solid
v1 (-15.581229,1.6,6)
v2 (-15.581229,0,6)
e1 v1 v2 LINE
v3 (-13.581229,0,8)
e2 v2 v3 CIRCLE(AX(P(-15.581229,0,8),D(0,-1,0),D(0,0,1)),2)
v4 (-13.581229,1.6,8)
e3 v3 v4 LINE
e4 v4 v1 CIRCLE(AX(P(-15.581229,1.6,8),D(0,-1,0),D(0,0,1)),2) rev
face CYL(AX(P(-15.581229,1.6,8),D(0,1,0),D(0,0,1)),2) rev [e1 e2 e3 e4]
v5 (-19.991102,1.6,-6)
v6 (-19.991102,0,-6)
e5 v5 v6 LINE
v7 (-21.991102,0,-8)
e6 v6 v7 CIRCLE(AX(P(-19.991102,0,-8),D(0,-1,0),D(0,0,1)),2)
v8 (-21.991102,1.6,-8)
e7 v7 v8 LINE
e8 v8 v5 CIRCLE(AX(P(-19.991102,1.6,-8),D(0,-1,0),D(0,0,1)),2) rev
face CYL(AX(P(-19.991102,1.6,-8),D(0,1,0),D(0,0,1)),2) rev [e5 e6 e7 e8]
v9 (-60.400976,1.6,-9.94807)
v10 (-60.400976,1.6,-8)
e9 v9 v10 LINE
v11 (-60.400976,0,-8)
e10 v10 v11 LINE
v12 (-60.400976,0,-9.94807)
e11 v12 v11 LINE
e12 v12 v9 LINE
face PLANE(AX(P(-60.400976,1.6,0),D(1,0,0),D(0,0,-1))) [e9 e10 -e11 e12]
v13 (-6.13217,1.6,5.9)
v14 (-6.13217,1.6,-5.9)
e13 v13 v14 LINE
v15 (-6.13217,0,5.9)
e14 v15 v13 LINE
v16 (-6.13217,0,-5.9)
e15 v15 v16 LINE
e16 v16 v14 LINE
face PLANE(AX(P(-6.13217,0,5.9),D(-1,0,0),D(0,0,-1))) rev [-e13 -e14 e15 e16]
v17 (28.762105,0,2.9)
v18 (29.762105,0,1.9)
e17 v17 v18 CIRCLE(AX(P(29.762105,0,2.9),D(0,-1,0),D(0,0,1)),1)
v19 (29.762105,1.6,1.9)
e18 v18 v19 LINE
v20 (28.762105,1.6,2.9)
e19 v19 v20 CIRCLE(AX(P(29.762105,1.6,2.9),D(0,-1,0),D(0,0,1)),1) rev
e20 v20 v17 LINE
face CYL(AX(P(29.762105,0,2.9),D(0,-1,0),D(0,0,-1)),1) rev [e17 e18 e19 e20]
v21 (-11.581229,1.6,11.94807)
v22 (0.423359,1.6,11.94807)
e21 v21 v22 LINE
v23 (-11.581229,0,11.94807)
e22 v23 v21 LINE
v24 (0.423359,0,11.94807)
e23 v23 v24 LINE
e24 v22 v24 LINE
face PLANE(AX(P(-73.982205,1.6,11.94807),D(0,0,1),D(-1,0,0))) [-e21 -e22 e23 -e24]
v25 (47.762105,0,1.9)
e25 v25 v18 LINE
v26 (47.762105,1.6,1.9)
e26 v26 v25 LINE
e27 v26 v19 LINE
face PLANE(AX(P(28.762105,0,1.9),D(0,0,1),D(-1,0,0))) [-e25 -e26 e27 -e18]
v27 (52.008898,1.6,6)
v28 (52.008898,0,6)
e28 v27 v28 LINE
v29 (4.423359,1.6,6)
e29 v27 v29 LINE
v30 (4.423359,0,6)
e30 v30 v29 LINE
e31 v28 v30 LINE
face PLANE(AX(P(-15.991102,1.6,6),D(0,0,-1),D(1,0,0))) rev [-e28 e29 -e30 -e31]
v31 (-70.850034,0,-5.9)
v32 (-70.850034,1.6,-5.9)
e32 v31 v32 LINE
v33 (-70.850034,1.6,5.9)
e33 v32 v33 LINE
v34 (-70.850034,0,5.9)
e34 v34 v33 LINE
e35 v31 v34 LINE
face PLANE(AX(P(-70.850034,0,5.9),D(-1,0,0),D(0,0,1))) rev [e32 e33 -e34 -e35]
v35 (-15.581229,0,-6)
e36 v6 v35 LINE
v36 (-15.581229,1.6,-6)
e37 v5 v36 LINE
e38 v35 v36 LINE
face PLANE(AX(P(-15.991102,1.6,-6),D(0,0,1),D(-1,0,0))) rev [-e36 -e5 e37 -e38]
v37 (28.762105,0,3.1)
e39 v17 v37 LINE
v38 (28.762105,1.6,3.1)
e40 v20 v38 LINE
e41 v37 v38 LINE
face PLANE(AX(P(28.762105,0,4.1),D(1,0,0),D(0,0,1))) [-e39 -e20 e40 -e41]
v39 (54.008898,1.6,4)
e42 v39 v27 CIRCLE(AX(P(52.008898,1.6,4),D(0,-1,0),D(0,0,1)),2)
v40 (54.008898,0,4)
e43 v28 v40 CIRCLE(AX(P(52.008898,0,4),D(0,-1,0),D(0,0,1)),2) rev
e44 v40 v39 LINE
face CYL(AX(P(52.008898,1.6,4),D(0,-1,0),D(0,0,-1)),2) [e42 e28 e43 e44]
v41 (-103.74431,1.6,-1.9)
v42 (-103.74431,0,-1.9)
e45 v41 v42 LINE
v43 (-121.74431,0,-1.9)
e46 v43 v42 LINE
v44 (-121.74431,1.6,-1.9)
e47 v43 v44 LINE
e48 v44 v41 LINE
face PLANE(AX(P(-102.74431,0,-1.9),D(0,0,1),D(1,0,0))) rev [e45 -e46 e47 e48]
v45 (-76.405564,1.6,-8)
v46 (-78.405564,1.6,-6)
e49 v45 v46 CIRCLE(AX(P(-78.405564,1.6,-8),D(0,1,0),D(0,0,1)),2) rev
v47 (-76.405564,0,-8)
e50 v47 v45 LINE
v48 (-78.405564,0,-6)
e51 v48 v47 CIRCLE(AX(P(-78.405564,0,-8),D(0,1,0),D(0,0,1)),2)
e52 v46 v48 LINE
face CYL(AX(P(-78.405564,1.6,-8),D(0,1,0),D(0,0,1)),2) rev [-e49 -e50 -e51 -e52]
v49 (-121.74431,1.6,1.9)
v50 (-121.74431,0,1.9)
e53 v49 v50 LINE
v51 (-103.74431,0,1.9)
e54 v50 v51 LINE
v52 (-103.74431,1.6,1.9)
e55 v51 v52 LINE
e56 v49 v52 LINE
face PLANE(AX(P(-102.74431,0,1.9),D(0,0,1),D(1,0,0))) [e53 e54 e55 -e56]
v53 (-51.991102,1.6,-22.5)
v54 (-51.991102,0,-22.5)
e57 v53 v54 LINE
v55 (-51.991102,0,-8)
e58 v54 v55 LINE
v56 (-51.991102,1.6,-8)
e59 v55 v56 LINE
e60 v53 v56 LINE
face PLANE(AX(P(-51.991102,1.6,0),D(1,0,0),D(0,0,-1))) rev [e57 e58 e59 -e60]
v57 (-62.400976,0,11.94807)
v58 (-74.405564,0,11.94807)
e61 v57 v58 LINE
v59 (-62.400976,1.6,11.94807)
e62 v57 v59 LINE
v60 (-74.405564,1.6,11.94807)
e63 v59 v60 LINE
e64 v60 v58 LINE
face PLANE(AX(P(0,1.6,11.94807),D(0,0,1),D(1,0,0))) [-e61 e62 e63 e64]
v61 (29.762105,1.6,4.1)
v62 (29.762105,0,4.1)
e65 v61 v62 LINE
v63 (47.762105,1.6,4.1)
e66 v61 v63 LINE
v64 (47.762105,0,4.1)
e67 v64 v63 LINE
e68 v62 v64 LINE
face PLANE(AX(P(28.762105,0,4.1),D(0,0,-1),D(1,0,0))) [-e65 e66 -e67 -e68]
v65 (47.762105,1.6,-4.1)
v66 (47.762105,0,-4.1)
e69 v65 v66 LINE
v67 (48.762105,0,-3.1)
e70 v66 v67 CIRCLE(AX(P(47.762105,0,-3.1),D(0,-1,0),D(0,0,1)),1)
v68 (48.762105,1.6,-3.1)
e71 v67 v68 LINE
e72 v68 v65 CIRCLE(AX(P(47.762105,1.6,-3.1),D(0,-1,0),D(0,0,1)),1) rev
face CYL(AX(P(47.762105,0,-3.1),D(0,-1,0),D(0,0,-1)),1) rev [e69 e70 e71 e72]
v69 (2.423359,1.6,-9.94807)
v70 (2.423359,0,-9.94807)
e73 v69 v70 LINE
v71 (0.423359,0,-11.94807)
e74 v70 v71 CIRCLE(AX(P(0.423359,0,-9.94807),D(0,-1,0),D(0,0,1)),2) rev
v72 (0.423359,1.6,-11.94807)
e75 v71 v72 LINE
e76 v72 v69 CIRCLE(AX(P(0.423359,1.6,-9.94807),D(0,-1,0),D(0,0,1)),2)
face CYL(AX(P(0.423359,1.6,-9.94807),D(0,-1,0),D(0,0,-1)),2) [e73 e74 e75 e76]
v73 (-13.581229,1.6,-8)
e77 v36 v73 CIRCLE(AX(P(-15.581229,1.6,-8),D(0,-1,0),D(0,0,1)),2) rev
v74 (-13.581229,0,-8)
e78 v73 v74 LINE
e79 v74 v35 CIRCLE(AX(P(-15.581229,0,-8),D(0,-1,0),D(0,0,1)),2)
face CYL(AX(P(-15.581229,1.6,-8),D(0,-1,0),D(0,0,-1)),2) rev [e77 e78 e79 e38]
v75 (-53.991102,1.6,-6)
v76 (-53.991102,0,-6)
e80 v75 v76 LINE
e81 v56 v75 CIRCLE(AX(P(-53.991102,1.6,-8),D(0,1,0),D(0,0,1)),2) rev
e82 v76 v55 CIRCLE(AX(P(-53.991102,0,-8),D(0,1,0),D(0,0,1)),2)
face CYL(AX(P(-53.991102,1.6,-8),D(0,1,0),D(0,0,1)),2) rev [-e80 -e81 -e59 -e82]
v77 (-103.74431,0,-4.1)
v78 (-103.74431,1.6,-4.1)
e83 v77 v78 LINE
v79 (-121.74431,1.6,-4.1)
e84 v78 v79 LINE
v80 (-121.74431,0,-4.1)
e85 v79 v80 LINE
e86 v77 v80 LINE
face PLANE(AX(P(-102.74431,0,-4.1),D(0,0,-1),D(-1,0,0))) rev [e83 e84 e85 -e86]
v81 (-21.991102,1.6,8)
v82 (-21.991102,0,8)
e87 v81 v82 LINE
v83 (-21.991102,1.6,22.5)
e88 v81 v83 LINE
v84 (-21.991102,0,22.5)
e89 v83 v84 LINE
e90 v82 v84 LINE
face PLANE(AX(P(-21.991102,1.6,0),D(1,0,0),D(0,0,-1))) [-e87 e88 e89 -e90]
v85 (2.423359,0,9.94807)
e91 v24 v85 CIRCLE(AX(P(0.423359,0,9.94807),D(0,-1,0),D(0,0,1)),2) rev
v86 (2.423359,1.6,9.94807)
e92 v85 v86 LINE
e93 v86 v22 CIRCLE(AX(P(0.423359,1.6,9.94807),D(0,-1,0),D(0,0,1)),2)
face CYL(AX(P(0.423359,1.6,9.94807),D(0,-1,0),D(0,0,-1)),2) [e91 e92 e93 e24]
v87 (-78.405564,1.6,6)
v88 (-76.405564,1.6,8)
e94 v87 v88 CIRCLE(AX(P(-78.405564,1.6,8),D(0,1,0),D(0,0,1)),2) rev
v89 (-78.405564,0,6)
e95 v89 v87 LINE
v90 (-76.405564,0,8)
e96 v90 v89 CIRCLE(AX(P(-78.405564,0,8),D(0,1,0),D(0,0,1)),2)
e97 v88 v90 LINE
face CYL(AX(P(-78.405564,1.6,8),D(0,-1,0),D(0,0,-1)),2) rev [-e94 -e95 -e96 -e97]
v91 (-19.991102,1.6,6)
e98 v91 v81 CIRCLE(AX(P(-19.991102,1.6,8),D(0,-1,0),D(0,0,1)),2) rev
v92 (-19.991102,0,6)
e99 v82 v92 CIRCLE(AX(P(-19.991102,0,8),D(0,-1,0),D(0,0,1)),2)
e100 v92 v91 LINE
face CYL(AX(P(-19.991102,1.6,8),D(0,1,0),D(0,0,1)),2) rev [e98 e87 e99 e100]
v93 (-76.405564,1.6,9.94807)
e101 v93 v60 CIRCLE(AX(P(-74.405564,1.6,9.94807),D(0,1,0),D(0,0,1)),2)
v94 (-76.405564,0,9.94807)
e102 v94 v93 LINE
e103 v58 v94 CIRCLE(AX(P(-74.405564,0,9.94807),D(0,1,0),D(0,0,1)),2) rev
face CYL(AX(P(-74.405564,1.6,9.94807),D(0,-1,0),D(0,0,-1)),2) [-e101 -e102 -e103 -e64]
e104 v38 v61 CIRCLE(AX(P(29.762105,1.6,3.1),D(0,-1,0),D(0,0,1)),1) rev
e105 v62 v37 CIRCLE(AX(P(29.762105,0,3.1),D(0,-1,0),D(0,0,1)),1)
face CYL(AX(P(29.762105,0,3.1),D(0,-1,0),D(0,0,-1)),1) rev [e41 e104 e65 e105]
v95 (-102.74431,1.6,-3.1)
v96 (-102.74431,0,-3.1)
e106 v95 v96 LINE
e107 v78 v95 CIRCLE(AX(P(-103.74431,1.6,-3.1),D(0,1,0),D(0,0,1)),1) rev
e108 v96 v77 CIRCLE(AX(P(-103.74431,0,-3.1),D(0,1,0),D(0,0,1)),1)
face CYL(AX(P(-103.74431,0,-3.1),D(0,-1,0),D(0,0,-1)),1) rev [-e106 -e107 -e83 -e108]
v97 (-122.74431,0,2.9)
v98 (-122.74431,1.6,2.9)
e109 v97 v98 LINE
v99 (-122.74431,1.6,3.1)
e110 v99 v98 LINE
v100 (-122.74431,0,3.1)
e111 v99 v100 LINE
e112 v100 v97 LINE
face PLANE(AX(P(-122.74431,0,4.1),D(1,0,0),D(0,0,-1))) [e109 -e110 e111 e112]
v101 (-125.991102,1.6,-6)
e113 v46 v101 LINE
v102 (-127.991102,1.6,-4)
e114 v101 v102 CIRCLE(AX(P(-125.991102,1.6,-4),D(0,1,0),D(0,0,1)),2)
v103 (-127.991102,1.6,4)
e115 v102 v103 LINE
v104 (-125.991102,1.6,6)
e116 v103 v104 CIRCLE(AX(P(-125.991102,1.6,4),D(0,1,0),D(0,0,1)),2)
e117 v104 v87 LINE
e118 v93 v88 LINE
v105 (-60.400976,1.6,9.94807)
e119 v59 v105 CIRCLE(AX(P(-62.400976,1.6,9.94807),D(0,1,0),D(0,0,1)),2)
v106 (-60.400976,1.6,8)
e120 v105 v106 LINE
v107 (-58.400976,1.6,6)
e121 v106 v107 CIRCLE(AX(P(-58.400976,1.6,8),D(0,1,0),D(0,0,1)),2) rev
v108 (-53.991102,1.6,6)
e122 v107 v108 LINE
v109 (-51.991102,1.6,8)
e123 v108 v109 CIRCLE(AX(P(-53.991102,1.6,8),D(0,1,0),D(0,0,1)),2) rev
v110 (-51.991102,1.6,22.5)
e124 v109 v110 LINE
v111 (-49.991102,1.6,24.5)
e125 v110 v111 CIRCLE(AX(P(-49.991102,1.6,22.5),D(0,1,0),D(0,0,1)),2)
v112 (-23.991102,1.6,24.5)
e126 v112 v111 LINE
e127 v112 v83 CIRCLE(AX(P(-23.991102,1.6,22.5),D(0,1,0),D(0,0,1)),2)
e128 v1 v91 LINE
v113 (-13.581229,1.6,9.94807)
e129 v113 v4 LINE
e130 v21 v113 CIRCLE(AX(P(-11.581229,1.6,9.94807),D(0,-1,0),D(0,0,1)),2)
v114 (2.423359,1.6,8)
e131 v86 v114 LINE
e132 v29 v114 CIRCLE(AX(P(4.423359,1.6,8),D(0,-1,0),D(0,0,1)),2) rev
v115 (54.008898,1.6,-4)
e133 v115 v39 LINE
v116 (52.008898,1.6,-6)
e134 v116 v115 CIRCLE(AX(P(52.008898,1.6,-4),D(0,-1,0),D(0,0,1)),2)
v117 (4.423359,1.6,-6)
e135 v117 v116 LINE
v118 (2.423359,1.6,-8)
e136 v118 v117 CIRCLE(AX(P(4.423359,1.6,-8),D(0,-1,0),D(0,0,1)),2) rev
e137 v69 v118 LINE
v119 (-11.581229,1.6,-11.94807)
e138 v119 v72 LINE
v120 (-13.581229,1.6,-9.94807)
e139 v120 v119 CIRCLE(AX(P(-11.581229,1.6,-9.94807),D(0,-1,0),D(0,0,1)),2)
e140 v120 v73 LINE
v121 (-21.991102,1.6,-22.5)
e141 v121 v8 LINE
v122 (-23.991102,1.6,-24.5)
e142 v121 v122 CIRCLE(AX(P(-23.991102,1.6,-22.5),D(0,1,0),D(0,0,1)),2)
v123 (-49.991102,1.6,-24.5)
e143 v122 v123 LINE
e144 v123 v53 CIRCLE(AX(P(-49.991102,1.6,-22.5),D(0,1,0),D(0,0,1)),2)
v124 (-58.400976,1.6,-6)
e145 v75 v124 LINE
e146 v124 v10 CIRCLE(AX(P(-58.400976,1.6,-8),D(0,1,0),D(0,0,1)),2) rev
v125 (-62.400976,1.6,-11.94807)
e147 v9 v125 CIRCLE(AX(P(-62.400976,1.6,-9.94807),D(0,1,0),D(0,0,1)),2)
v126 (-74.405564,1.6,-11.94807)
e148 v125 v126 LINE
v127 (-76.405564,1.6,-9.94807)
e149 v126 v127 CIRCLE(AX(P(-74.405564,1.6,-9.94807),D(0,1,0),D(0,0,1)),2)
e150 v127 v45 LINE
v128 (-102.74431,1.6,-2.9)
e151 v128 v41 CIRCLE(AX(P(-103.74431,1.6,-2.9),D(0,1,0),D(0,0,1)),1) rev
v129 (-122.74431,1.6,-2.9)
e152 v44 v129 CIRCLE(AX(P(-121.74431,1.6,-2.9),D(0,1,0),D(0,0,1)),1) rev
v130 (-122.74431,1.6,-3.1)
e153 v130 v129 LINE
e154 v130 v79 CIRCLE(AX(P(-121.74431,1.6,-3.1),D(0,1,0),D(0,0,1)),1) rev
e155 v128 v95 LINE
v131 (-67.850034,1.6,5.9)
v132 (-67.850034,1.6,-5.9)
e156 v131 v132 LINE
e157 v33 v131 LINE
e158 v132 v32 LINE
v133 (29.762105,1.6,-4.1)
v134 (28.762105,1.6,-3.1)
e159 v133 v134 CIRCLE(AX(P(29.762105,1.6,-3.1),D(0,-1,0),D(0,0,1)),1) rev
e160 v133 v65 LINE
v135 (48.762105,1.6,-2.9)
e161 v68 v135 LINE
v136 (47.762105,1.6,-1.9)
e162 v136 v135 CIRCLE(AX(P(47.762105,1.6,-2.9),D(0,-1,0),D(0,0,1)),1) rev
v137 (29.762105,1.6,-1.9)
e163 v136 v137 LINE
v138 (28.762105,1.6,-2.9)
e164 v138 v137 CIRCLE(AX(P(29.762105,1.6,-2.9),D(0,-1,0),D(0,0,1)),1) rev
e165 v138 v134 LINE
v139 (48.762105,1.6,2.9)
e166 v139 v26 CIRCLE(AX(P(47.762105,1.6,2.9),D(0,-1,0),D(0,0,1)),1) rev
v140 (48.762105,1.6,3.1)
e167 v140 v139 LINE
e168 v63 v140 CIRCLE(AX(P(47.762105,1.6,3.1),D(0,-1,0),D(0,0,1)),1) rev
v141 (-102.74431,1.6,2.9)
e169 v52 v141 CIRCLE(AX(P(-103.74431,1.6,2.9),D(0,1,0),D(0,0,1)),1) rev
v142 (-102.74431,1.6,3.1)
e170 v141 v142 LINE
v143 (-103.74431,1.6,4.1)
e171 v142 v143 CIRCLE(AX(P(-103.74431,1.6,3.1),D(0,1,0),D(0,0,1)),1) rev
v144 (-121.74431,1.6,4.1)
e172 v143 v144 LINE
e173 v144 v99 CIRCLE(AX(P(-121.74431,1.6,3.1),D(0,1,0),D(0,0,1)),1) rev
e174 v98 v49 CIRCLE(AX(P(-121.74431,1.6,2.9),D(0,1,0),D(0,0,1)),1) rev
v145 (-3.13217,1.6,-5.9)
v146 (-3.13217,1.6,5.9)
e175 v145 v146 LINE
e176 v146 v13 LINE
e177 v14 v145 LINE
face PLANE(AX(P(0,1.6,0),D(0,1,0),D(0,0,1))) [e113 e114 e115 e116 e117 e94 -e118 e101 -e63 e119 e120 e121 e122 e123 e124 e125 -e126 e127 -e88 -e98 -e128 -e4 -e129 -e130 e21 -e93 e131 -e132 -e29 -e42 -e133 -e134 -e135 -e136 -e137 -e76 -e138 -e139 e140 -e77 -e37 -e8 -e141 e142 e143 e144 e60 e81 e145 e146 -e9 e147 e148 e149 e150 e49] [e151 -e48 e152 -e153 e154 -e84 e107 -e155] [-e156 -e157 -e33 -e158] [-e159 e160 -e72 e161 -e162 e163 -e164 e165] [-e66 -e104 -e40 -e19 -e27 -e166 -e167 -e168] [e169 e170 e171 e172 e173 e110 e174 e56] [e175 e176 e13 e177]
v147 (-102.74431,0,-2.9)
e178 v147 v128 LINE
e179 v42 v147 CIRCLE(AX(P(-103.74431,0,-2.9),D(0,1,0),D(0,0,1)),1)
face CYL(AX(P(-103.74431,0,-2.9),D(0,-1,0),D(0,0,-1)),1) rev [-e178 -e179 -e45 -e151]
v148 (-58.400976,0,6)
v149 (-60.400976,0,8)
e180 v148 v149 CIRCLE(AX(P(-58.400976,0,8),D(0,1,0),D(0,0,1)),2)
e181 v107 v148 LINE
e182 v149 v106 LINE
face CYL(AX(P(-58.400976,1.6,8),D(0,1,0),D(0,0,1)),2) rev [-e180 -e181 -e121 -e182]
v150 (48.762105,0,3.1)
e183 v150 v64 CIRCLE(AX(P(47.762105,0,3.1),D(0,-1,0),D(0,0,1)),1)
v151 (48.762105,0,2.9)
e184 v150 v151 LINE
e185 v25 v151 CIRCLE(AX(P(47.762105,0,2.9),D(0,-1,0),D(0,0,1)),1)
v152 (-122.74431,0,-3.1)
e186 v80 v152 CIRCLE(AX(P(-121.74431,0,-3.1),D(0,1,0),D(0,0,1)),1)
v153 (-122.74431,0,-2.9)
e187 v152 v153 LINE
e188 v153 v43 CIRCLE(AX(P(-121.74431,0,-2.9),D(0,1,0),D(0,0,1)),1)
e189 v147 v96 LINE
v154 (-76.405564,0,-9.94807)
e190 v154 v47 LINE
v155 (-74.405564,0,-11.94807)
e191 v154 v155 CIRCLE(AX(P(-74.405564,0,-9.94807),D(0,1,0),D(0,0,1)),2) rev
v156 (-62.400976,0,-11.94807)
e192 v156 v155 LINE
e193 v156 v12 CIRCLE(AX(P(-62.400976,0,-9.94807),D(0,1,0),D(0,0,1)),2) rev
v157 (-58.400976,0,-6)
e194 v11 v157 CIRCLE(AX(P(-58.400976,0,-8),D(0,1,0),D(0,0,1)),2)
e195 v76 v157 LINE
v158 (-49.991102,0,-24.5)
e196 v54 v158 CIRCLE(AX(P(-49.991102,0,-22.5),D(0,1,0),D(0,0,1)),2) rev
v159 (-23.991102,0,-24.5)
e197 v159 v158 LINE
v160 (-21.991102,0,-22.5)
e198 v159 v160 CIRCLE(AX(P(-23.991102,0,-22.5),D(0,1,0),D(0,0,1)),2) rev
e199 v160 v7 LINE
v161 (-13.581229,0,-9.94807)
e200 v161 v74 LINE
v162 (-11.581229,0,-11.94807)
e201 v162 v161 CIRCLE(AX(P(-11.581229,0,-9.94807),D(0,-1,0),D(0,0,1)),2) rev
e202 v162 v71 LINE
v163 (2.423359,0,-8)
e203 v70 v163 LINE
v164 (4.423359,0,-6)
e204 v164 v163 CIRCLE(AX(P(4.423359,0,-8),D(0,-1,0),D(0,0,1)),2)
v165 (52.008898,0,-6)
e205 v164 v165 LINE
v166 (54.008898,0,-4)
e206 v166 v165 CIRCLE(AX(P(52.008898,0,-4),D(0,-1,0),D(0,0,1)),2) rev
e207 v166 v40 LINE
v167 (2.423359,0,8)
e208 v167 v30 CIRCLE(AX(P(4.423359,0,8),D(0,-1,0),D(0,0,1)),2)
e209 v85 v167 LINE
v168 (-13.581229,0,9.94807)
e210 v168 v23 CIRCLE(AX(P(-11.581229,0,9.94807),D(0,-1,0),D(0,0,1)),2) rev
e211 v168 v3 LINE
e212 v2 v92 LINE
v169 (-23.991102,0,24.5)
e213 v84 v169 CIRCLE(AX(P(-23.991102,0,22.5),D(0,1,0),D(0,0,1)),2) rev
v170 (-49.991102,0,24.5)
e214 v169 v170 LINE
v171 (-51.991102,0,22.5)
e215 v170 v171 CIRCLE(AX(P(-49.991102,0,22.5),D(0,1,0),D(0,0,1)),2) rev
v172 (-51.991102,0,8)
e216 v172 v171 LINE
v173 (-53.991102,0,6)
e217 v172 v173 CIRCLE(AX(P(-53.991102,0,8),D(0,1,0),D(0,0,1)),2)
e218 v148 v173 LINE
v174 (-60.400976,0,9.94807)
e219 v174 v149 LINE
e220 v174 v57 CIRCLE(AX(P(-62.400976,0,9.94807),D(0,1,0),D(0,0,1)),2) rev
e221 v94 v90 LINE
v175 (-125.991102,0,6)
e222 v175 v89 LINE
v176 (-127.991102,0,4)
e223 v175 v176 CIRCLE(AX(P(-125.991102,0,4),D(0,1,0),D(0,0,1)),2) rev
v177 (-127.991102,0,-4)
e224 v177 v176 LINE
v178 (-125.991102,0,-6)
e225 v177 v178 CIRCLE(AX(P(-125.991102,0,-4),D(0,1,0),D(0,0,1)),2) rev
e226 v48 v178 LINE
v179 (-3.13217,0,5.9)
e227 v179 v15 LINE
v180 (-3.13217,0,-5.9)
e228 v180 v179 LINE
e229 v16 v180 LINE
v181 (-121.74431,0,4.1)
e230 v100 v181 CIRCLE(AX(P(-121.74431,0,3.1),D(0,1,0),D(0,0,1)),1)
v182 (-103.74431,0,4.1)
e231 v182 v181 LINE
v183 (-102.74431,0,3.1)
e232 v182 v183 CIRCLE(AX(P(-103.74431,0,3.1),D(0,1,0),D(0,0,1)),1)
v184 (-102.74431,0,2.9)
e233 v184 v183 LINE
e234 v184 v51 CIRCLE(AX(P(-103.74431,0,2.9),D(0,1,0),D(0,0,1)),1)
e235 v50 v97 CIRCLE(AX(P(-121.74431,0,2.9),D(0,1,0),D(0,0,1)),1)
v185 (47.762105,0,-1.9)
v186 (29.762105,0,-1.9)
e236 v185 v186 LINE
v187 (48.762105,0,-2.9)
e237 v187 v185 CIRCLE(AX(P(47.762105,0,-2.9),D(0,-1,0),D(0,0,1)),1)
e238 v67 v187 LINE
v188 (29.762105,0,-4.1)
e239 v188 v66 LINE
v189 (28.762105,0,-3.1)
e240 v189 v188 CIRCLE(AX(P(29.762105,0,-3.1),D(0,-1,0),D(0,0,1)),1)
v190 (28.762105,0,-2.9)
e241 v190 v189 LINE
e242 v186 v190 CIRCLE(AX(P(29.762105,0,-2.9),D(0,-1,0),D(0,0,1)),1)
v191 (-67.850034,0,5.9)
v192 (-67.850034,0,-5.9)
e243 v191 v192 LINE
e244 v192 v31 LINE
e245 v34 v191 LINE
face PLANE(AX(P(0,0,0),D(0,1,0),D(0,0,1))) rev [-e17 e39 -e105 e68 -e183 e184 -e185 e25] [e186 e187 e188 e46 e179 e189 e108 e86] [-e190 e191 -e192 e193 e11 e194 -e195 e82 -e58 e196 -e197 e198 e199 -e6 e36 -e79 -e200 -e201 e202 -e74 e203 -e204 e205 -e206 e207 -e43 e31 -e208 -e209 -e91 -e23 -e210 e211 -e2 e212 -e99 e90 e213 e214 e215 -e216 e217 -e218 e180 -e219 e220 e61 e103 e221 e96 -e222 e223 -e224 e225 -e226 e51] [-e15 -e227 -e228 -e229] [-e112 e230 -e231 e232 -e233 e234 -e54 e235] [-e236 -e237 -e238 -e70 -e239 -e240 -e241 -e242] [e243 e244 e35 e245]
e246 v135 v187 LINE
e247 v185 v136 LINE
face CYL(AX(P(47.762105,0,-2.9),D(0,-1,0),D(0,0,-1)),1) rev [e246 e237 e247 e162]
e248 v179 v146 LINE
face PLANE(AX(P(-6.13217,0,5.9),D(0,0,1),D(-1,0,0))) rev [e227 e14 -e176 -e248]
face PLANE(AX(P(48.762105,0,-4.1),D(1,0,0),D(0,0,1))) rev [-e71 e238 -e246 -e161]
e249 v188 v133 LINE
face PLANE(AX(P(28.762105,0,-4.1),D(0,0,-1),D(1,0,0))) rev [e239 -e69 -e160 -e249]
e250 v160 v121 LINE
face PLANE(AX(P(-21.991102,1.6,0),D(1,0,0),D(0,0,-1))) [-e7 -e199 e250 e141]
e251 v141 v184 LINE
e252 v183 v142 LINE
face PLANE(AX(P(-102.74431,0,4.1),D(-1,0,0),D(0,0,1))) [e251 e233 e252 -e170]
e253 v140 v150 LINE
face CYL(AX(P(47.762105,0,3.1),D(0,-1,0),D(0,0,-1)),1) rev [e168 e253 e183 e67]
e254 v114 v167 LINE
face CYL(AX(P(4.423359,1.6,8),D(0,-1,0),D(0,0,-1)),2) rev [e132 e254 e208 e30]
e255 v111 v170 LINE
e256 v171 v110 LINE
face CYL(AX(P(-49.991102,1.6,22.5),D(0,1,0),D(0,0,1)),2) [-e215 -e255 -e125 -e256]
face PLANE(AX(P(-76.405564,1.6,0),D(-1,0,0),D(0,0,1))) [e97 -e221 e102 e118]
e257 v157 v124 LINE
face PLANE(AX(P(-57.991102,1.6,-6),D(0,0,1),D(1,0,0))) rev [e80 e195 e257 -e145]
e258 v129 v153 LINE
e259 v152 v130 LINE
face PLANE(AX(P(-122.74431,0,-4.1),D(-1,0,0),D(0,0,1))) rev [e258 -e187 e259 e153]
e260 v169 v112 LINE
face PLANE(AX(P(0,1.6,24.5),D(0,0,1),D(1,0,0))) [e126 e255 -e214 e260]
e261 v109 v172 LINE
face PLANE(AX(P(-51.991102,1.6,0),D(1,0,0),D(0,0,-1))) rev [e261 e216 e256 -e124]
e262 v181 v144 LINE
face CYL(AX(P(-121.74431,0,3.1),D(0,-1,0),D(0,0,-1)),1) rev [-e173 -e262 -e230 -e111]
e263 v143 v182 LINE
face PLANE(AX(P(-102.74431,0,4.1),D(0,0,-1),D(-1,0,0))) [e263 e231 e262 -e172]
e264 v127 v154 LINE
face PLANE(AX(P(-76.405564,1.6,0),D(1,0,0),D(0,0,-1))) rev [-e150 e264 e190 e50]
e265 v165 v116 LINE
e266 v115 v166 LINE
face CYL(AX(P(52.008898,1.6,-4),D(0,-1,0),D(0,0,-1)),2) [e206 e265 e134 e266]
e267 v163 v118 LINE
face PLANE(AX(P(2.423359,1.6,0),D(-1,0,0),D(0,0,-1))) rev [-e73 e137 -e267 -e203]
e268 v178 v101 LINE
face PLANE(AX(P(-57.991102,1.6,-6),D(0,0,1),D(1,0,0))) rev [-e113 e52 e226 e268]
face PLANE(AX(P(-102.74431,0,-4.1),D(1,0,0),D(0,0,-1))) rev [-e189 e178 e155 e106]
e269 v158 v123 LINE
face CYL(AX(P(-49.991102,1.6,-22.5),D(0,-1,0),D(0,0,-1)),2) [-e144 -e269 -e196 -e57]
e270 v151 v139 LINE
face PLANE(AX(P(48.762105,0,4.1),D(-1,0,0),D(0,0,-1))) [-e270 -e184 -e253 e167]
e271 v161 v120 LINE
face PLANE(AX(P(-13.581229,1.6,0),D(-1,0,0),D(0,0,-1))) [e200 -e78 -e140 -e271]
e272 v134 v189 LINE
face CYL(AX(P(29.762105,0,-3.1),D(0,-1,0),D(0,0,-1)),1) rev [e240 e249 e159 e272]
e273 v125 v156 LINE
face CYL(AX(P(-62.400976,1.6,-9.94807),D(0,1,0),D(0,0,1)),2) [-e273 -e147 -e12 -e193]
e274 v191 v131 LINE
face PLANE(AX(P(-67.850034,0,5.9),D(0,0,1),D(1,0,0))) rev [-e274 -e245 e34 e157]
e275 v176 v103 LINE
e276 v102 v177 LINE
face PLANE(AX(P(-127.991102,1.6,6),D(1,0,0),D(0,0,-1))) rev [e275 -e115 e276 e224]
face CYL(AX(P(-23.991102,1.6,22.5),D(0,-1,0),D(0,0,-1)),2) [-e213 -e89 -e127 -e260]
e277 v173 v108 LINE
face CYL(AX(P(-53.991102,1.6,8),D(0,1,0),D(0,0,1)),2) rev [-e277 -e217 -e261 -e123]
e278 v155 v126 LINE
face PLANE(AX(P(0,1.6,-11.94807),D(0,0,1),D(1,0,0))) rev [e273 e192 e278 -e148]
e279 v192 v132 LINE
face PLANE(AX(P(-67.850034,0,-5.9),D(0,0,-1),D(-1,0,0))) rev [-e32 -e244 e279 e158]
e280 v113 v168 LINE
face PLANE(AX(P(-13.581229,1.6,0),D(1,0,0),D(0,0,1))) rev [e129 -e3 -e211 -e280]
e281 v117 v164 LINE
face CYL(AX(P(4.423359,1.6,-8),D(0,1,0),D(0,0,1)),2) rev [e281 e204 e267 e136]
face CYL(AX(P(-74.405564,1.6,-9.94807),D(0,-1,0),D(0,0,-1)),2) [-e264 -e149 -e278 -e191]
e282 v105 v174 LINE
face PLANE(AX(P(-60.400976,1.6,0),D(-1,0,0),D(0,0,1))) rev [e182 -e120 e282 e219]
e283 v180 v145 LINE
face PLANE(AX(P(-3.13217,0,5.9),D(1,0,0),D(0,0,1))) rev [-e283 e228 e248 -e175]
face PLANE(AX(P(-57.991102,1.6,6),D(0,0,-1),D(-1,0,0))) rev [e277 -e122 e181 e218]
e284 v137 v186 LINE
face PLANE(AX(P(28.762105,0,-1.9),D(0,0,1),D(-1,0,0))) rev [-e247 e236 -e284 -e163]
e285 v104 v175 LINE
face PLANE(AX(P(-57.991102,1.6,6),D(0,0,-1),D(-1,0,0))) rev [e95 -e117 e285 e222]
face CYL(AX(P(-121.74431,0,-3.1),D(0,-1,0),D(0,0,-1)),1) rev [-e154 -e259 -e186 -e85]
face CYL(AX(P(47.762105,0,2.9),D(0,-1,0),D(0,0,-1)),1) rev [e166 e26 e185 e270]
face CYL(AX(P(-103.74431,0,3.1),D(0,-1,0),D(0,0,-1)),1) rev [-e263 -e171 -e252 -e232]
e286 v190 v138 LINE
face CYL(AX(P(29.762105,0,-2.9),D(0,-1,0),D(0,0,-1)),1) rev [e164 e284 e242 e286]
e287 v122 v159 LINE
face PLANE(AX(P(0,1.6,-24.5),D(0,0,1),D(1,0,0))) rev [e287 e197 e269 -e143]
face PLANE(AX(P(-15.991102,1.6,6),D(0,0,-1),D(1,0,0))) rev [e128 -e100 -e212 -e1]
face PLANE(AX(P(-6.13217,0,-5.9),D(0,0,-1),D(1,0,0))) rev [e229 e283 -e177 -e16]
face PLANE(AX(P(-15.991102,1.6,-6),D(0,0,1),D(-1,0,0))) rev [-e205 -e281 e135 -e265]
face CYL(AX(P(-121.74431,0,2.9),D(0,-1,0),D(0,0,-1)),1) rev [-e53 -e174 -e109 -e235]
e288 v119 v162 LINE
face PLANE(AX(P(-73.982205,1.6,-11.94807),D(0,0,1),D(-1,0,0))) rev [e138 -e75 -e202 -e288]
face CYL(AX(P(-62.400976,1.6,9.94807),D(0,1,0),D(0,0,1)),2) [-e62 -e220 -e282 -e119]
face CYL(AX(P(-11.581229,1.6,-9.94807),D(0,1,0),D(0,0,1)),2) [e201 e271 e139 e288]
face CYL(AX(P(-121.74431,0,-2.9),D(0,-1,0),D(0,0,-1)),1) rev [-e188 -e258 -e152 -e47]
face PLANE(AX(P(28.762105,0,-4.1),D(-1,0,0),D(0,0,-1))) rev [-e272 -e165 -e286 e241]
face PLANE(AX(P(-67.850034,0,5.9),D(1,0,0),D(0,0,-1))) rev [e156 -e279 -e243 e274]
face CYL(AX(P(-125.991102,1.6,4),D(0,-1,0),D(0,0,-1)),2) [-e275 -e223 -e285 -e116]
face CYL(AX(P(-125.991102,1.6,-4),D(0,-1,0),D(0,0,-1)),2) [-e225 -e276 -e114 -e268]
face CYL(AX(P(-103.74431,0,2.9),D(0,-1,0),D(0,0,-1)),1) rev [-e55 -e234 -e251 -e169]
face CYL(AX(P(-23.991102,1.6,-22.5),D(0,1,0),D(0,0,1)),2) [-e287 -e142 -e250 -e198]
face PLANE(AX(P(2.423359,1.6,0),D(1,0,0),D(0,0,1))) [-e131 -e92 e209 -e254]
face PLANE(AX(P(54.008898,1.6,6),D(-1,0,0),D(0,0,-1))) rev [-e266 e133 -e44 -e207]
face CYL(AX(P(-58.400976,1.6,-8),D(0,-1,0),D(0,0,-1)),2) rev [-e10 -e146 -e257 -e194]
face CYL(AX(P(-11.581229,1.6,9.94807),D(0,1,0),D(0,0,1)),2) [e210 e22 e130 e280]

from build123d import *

# Parameters (mm, degrees)
SKETCH_11_W             = 70
SKETCH_11_H             = 12
EXTRUDE_6_DEPTH         = 1.6
SKETCH_12_W             = 3
SKETCH_12_H             = 11.8
CUT_EXTRUDE_6_DEPTH     = 1.6
SKETCH_13_W             = 20
SKETCH_13_H             = 2.2
CUT_EXTRUDE_7_DEPTH     = 1.6
FILLET_1_R              = 1
FILLET_1_OF_MIRROR_15_R = 1
EXTRUDE_7_DEPTH         = 1.6
SKETCH_16_W             = 6
SKETCH_16_H             = 12
EXTRUDE_9_DEPTH         = 1.6
SKETCH_18_W             = 30
SKETCH_18_H             = 49
EXTRUDE_12_DEPTH        = 1.6
FILLET_3_R              = 2
MIRROR_24_OUTLINE_W     = 3
MIRROR_24_OUTLINE_H     = 11.8
MIRROR_24_DEPTH         = 1.6
FILLET_4_R              = 2


# Read off the part's stored shape, not the designer's step: 镜向24
with BuildPart() as part:
    # 草图11 → 凸台-拉伸6 (new body)
    with BuildSketch(Plane(origin=(0, 0, 0), x_dir=(1, 0, 0), z_dir=(0, 1, 0))):
        with Locations((-92.991102456, 0)):
            Rectangle(SKETCH_11_W, SKETCH_11_H)
    extrude(amount=EXTRUDE_6_DEPTH)

    # 草图12 → 切除-拉伸6 (cut)
    with BuildSketch(Plane(origin=(0, 1.6, 0), x_dir=(1, 0, 0), z_dir=(0, 1, 0))):
        with Locations((-69.350034459, 0)):
            Rectangle(SKETCH_12_W, SKETCH_12_H)
    extrude(amount=-CUT_EXTRUDE_6_DEPTH, mode=Mode.SUBTRACT)

    # 草图13 → 切除-拉伸7 (cut)
    with BuildSketch(Plane(origin=(0, 1.6, 0), x_dir=(1, 0, 0), z_dir=(0, 1, 0))):
        with Locations((-112.744310304, 3)):
            Rectangle(SKETCH_13_W, SKETCH_13_H)
    cut_extrude_7 = extrude(amount=-CUT_EXTRUDE_7_DEPTH, mode=Mode.SUBTRACT)

    # 圆角1
    fillet_1_edges = [part.edges().sort_by_distance(p)[0] for p in [
        (-122.744310304, 0.8, -1.9),
        (-122.744310304, 0.8, -4.1),
        (-102.744310304, 0.8, -4.1),
        (-102.744310304, 0.8, -1.9),
    ]]
    fillet(fillet_1_edges, radius=FILLET_1_R)

    # 镜向15: 切除-拉伸7 across plane
    add(cut_extrude_7.mirror(Plane(origin=(0, 0, 0), x_dir=(1, 0, 0), z_dir=(0, 0, -1))), mode=Mode.SUBTRACT)

    # 圆角1 of 镜向15
    fillet_1_of_mirror_15_edges = [part.edges().sort_by_distance(p)[0] for p in [
        (-122.744310304, 0.8, 1.9),
        (-122.744310304, 0.8, 4.1),
        (-102.744310304, 0.8, 4.1),
        (-102.744310304, 0.8, 1.9),
    ]]
    fillet(fillet_1_of_mirror_15_edges, radius=FILLET_1_OF_MIRROR_15_R)

    # 草图14 → 凸台-拉伸7 (add)
    with BuildSketch(Plane(origin=(0, 0, 0), x_dir=(1, 0, 0), z_dir=(0, 1, 0))):
        Polygon((-60.400975616, 6), (-60.400975616, 11.948069584), (-62.610711949, 11.948069584), (-76.405563985, 11.948069584), (-76.405563985, 6), (-74.195827651, 6), (-62.609356584, 6), align=None)
    extrude_7 = extrude(amount=EXTRUDE_7_DEPTH)

    # 镜向17: 凸台-拉伸7 across plane
    add(extrude_7.mirror(Plane(origin=(0, 0, 0), x_dir=(1, 0, 0), z_dir=(0, 0, -1))))

    # 草图16 → 凸台-拉伸9 (add)
    with BuildSketch(Plane(origin=(0, 0, 0), x_dir=(1, 0, 0), z_dir=(0, 1, 0))):
        with Locations((-54.991102456, 0)):
            Rectangle(SKETCH_16_W, SKETCH_16_H)
    extrude(amount=EXTRUDE_9_DEPTH)

    # 草图18 → 凸台-拉伸12 (add)
    with BuildSketch(Plane(origin=(0, 0, 0), x_dir=(1, 0, 0), z_dir=(0, 1, 0))):
        with Locations((-36.991102456, 0)):
            Rectangle(SKETCH_18_W, SKETCH_18_H)
    extrude(amount=EXTRUDE_12_DEPTH)

    # 圆角3
    fillet_3_edges = [part.edges().sort_by_distance(p)[0] for p in [
        (-127.991102456, 0.8, 6),
        (-127.991102456, 0.8, -6),
        (-51.991102456, 0.8, -6),
        (-51.991102456, 0.8, 6),
        (-76.405563985, 0.8, 6),
        (-60.400975616, 0.8, 6),
        (-60.400975616, 0.8, -6),
        (-76.405563985, 0.8, -6),
        (-60.400975616, 0.8, 11.948069584),
        (-76.405563985, 0.8, 11.948069584),
        (-76.405563985, 0.8, -11.948069584),
        (-60.400975616, 0.8, -11.948069584),
    ]]
    fillet(fillet_3_edges, radius=FILLET_3_R)

    # 镜向24 outline → 镜向24 (add)
    with BuildSketch(Plane(origin=(0, 0, 0), x_dir=(1, 0, 0), z_dir=(0, 1, 0))):
        with BuildLine():
            Line((4.423359072, -6), (52.008897544, -6))
            ThreePointArc((52.008897544, -6), (53.423111106, -5.414213562), (54.008897544, -4))
            Line((54.008897544, -4), (54.008897544, 4))
            ThreePointArc((54.008897544, 4), (53.423111106, 5.414213562), (52.008897544, 6))
            Line((52.008897544, 6), (4.423359072, 6))
            ThreePointArc((4.423359072, 6), (3.00914551, 6.585786438), (2.423359072, 8))
            Line((2.423359072, 8), (2.423359072, 9.948069584))
            ThreePointArc((2.423359072, 9.948069584), (1.837572634, 11.362283146), (0.423359072, 11.948069584))
            Line((0.423359072, 11.948069584), (-11.581229297, 11.948069584))
            ThreePointArc((-11.581229297, 11.948069584), (-12.995442859, 11.362283146), (-13.581229297, 9.948069584))
            Line((-13.581229297, 9.948069584), (-13.581229297, 8))
            ThreePointArc((-13.581229297, 8), (-14.167015735, 6.585786438), (-15.581229297, 6))
            Line((-15.581229297, 6), (-19.991102456, 6))
            ThreePointArc((-19.991102456, 6), (-21.405316019, 6.585786437), (-21.991102456, 8))
            Line((-21.991102456, 8), (-21.991102456, -8))
            ThreePointArc((-21.991102456, -8), (-21.405316019, -6.585786437), (-19.991102456, -6))
            Line((-19.991102456, -6), (-15.581229297, -6))
            ThreePointArc((-15.581229297, -6), (-14.167015735, -6.585786438), (-13.581229297, -8))
            Line((-13.581229297, -8), (-13.581229297, -9.948069584))
            ThreePointArc((-13.581229297, -9.948069584), (-12.995442859, -11.362283146), (-11.581229297, -11.948069584))
            Line((-11.581229297, -11.948069584), (0.423359072, -11.948069584))
            ThreePointArc((0.423359072, -11.948069584), (1.837572634, -11.362283146), (2.423359072, -9.948069584))
            Line((2.423359072, -9.948069584), (2.423359072, -8))
            ThreePointArc((2.423359072, -8), (3.00914551, -6.585786438), (4.423359072, -6))
        make_face()
        with Locations((-4.632170453, 0)):
            Rectangle(MIRROR_24_OUTLINE_W, MIRROR_24_OUTLINE_H, mode=Mode.SUBTRACT)
        with BuildLine():
            ThreePointArc((28.762105391, -2.9), (29.05499861, -2.192893219), (29.762105391, -1.9))
            Line((29.762105391, -1.9), (47.762105391, -1.9))
            ThreePointArc((47.762105391, -1.9), (48.469212172, -2.192893219), (48.762105391, -2.9))
            Line((48.762105391, -2.9), (48.762105391, -3.1))
            ThreePointArc((48.762105391, -3.1), (48.469212172, -3.807106781), (47.762105391, -4.1))
            Line((47.762105391, -4.1), (29.762105391, -4.1))
            ThreePointArc((29.762105391, -4.1), (29.05499861, -3.807106781), (28.762105391, -3.1))
            Line((28.762105391, -3.1), (28.762105391, -2.9))
        make_face(mode=Mode.SUBTRACT)
        with BuildLine():
            Line((29.762105391, 4.1), (47.762105391, 4.1))
            ThreePointArc((47.762105391, 4.1), (48.469212172, 3.807106781), (48.762105391, 3.1))
            Line((48.762105391, 3.1), (48.762105391, 2.9))
            ThreePointArc((48.762105391, 2.9), (48.469212172, 2.192893219), (47.762105391, 1.9))
            Line((47.762105391, 1.9), (29.762105391, 1.9))
            ThreePointArc((29.762105391, 1.9), (29.05499861, 2.192893219), (28.762105391, 2.9))
            Line((28.762105391, 2.9), (28.762105391, 3.1))
            ThreePointArc((28.762105391, 3.1), (29.05499861, 3.807106781), (29.762105391, 4.1))
        make_face(mode=Mode.SUBTRACT)
    extrude(amount=MIRROR_24_DEPTH)

    # 圆角4
    fillet_4_edges = [part.edges().sort_by_distance(p)[0] for p in [
        (-21.991102456, 0.8, -24.5),
        (-51.991102456, 0.8, -24.5),
        (-51.991102456, 0.8, 24.5),
        (-21.991102456, 0.8, 24.5),
    ]]
    fillet(fillet_4_edges, radius=FILLET_4_R)


solid = part.part
